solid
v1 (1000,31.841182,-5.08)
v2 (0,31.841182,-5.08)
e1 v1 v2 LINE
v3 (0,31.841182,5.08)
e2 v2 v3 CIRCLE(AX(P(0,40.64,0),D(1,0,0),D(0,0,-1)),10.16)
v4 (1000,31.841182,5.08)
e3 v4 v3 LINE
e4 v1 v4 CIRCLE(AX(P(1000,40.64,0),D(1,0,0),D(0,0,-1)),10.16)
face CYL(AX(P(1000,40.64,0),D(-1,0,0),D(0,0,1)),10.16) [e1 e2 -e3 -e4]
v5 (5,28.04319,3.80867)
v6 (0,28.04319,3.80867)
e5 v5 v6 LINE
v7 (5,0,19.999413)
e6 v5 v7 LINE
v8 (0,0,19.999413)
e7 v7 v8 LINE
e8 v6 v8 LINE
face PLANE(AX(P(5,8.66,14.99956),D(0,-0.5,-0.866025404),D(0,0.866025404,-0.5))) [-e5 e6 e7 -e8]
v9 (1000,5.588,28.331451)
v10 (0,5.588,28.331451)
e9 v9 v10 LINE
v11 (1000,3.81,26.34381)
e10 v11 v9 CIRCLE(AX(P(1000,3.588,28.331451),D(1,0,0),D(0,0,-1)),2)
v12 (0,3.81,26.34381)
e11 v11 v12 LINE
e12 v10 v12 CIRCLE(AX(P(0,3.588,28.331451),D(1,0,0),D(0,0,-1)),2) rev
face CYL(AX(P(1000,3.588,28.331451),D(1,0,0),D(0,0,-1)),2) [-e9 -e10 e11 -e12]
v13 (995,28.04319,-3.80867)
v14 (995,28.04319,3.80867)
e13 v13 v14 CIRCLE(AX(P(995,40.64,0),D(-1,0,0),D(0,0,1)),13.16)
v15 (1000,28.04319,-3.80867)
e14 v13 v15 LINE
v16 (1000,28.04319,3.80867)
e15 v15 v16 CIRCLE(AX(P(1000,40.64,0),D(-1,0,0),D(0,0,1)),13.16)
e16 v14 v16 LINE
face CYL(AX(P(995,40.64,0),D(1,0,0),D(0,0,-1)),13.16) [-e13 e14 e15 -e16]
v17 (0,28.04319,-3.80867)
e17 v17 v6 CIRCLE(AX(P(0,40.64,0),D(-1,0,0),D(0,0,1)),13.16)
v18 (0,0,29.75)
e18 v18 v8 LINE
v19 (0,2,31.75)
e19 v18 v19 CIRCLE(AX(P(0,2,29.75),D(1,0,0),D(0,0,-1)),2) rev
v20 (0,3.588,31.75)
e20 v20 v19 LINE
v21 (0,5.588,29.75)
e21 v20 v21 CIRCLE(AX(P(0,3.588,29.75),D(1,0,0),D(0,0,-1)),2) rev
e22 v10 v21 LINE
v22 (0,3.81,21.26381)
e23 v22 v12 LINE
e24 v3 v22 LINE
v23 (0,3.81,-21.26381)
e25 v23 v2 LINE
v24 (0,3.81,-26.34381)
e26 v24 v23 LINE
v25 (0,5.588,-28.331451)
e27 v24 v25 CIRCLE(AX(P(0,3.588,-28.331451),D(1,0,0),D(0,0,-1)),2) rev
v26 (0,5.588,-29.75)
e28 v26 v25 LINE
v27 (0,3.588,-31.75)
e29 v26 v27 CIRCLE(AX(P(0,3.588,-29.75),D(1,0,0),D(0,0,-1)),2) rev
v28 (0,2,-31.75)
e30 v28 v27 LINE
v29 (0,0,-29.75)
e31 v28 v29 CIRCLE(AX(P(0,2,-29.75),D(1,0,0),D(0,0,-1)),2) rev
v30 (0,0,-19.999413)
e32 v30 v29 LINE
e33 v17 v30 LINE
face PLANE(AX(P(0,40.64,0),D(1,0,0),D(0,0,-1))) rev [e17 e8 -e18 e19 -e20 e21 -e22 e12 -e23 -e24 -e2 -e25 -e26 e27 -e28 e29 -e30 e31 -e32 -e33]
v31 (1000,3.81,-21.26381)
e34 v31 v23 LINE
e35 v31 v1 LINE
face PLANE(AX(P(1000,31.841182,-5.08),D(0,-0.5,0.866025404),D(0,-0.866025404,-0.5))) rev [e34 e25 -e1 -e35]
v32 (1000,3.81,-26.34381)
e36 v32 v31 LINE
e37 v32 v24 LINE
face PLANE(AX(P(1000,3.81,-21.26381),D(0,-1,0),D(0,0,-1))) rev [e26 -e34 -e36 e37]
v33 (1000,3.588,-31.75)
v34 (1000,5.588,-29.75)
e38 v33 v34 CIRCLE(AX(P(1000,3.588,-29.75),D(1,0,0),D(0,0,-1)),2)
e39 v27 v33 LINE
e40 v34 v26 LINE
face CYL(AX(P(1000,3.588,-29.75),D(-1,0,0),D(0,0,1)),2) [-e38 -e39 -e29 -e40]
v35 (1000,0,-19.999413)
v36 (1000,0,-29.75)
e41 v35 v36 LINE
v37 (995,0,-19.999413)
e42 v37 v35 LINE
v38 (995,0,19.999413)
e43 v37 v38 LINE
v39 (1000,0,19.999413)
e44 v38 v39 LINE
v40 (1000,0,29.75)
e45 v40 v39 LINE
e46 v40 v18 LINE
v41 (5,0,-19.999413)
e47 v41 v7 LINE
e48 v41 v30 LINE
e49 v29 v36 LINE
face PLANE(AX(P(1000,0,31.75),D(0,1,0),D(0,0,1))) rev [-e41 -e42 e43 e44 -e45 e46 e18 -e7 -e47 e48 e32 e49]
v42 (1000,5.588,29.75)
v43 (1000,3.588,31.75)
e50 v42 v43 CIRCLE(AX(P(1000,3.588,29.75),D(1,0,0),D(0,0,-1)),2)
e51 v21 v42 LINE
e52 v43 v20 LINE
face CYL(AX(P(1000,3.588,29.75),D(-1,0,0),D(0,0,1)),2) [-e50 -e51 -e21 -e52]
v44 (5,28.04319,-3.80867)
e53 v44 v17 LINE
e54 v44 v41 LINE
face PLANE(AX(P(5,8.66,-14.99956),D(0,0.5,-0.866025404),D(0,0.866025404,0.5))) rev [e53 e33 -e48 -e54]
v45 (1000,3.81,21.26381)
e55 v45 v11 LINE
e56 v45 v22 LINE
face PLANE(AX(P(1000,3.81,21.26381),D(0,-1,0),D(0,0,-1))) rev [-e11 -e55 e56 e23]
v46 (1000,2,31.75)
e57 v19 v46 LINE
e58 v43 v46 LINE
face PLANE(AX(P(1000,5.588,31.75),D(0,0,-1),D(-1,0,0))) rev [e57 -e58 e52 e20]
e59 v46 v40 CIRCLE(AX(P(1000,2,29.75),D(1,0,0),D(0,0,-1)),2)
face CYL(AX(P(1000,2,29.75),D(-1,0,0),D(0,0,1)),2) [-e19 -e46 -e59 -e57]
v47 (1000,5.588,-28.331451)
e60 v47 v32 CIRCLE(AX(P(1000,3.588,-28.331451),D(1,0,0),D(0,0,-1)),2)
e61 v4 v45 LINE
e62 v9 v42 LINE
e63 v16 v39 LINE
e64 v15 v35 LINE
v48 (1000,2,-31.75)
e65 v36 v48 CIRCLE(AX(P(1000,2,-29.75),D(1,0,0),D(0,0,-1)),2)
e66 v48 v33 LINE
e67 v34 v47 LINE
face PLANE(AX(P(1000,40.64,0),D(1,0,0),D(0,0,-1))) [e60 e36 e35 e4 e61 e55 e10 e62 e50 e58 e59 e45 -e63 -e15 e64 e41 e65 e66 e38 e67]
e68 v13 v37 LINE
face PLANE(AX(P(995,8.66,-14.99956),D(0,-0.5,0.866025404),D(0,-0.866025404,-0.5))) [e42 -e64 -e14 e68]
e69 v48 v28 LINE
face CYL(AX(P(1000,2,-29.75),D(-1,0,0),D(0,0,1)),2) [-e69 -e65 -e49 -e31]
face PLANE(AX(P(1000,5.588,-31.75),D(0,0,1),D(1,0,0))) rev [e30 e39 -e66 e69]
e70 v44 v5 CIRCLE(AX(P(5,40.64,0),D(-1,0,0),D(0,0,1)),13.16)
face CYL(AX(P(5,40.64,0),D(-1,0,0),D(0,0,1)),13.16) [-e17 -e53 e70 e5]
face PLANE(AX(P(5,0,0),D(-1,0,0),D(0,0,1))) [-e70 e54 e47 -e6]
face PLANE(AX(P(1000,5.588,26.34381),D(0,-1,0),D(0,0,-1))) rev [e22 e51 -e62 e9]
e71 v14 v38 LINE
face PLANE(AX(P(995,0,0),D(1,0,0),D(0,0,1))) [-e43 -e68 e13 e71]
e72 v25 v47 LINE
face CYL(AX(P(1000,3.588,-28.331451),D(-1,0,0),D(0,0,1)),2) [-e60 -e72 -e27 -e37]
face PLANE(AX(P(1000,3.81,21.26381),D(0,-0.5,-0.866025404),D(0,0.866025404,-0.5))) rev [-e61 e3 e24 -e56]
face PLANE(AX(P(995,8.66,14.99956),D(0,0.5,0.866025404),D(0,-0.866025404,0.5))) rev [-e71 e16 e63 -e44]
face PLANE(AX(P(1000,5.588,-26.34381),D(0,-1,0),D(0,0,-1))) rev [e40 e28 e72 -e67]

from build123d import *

# Parameters (mm, degrees)
BOSS_EXTRUDE1_DEPTH = 1000
CUT_EXTRUDE1_DEPTH  = 5
FILLET1_R           = 2


with BuildPart() as part:
    # Sketch1 → Boss-Extrude1 (new body)
    with BuildSketch(Plane(origin=(0, 0, 0), x_dir=(0, 0, -1), z_dir=(1, 0, 0))):
        with BuildLine():
            Line((-21.263810414, 3.81), (-5.08, 31.841181898))
            ThreePointArc((-5.08, 31.841181898), (0, 50.8), (5.08, 31.841181898))
            Line((5.08, 31.841181898), (21.263810414, 3.81))
            Line((21.263810414, 3.81), (26.343810414, 3.81))
            Line((26.343810414, 3.81), (26.343810414, 5.588))
            Line((26.343810414, 5.588), (31.75, 5.588))
            Line((31.75, 5.588), (31.75, 0))
            Line((31.75, 0), (-31.75, 0))
            Line((-31.75, 0), (-31.75, 5.588))
            Line((-31.75, 5.588), (-26.343810414, 5.588))
            Line((-26.343810414, 5.588), (-26.343810414, 3.81))
            Line((-26.343810414, 3.81), (-21.263810414, 3.81))
        make_face()
    extrude(amount=BOSS_EXTRUDE1_DEPTH)

    # Sketch2 → Cut-Extrude1 (cut)
    with BuildSketch(Plane.ZY):
        with BuildLine():
            Line((19.999413325, 0), (18.267362517, 3))
            Line((18.267362517, 3), (3.808670233, 28.043189647))
            ThreePointArc((3.808670233, 28.043189647), (0, 27.48), (-3.808670233, 28.043189647))
            Line((-3.808670233, 28.043189647), (-18.267362517, 3))
            Line((-18.267362517, 3), (-19.999413325, 0))
            Line((-19.999413325, 0), (19.999413325, 0))
        make_face()
    cut_extrude1 = extrude(amount=-CUT_EXTRUDE1_DEPTH, mode=Mode.SUBTRACT)

    # Mirror1: Cut-Extrude1 across plane
    add(cut_extrude1.mirror(Plane.ZY.offset(-500)), mode=Mode.SUBTRACT)

    # Fillet1
    # the kernel refuses this fillet: 2 mm, written as the material it takes off along each edge
    with BuildSketch(Plane(origin=(-5, 0, 31.75), x_dir=(0, 1, 0), z_dir=(1, 0, 0)), Plane(origin=(-5, 5.588, 31.75), x_dir=(0, 0, -1), z_dir=(1, 0, 0)), Plane(origin=(-5, 0, -31.75), x_dir=(0, 0, 1), z_dir=(1, 0, 0)), Plane(origin=(-5, 5.588, -31.75), x_dir=(0, -1, 0), z_dir=(1, 0, 0))) as fillet1_piece_1:
        with BuildLine():
            CenterArc((FILLET1_R, -FILLET1_R), FILLET1_R, 90, 90)
            Line((0, -FILLET1_R), (-FILLET1_R * 0.02, -FILLET1_R))
            Line((-FILLET1_R * 0.02, -FILLET1_R), (-FILLET1_R * 0.02, FILLET1_R * 0.02))
            Line((-FILLET1_R * 0.02, FILLET1_R * 0.02), (FILLET1_R, FILLET1_R * 0.02))
            Line((FILLET1_R, FILLET1_R * 0.02), (FILLET1_R, 0))
        make_face()
    extrude(amount=1010, mode=Mode.SUBTRACT)
    with BuildSketch(Plane(origin=(-4.969102032, 5.588, 26.343810414), x_dir=(0, -1, 0), z_dir=(1, 0, 0))) as fillet1_piece_2:
        with BuildLine():
            CenterArc((2, -1.987640813), FILLET1_R, 96.372964386, 83.627035614)
            Line((0, -1.987640813), (-0.04, -1.987640813))
            Line((-0.04, -1.987640813), (-0.04, 0))
            Line((-0.04, 0), (0, 0.04))
            ThreePointArc((0, 0.04), (0.889, 0.04), (1.77356, 0.039752816))
            Line((1.77356, 0.039752816), (1.778, 0))
        make_face()
    extrude(amount=1009.938204063, mode=Mode.SUBTRACT)
    with BuildSketch(Plane(origin=(-4.969102032, 5.588, -26.343810414), x_dir=(0, 0, -1), z_dir=(1, 0, 0))) as fillet1_piece_3:
        with BuildLine():
            CenterArc((1.987640813, -2), FILLET1_R, 90, 83.627035614)
            Line((0, -1.778), (-0.039752816, -1.77356))
            ThreePointArc((-0.039752816, -1.77356), (-0.04, -0.889), (-0.04, 0))
            Line((-0.04, 0), (0, 0.04))
            Line((0, 0.04), (1.987640813, 0.04))
            Line((1.987640813, 0.04), (1.987640813, 0))
        make_face()
    extrude(amount=1009.938204063, mode=Mode.SUBTRACT)


solid = part.part
